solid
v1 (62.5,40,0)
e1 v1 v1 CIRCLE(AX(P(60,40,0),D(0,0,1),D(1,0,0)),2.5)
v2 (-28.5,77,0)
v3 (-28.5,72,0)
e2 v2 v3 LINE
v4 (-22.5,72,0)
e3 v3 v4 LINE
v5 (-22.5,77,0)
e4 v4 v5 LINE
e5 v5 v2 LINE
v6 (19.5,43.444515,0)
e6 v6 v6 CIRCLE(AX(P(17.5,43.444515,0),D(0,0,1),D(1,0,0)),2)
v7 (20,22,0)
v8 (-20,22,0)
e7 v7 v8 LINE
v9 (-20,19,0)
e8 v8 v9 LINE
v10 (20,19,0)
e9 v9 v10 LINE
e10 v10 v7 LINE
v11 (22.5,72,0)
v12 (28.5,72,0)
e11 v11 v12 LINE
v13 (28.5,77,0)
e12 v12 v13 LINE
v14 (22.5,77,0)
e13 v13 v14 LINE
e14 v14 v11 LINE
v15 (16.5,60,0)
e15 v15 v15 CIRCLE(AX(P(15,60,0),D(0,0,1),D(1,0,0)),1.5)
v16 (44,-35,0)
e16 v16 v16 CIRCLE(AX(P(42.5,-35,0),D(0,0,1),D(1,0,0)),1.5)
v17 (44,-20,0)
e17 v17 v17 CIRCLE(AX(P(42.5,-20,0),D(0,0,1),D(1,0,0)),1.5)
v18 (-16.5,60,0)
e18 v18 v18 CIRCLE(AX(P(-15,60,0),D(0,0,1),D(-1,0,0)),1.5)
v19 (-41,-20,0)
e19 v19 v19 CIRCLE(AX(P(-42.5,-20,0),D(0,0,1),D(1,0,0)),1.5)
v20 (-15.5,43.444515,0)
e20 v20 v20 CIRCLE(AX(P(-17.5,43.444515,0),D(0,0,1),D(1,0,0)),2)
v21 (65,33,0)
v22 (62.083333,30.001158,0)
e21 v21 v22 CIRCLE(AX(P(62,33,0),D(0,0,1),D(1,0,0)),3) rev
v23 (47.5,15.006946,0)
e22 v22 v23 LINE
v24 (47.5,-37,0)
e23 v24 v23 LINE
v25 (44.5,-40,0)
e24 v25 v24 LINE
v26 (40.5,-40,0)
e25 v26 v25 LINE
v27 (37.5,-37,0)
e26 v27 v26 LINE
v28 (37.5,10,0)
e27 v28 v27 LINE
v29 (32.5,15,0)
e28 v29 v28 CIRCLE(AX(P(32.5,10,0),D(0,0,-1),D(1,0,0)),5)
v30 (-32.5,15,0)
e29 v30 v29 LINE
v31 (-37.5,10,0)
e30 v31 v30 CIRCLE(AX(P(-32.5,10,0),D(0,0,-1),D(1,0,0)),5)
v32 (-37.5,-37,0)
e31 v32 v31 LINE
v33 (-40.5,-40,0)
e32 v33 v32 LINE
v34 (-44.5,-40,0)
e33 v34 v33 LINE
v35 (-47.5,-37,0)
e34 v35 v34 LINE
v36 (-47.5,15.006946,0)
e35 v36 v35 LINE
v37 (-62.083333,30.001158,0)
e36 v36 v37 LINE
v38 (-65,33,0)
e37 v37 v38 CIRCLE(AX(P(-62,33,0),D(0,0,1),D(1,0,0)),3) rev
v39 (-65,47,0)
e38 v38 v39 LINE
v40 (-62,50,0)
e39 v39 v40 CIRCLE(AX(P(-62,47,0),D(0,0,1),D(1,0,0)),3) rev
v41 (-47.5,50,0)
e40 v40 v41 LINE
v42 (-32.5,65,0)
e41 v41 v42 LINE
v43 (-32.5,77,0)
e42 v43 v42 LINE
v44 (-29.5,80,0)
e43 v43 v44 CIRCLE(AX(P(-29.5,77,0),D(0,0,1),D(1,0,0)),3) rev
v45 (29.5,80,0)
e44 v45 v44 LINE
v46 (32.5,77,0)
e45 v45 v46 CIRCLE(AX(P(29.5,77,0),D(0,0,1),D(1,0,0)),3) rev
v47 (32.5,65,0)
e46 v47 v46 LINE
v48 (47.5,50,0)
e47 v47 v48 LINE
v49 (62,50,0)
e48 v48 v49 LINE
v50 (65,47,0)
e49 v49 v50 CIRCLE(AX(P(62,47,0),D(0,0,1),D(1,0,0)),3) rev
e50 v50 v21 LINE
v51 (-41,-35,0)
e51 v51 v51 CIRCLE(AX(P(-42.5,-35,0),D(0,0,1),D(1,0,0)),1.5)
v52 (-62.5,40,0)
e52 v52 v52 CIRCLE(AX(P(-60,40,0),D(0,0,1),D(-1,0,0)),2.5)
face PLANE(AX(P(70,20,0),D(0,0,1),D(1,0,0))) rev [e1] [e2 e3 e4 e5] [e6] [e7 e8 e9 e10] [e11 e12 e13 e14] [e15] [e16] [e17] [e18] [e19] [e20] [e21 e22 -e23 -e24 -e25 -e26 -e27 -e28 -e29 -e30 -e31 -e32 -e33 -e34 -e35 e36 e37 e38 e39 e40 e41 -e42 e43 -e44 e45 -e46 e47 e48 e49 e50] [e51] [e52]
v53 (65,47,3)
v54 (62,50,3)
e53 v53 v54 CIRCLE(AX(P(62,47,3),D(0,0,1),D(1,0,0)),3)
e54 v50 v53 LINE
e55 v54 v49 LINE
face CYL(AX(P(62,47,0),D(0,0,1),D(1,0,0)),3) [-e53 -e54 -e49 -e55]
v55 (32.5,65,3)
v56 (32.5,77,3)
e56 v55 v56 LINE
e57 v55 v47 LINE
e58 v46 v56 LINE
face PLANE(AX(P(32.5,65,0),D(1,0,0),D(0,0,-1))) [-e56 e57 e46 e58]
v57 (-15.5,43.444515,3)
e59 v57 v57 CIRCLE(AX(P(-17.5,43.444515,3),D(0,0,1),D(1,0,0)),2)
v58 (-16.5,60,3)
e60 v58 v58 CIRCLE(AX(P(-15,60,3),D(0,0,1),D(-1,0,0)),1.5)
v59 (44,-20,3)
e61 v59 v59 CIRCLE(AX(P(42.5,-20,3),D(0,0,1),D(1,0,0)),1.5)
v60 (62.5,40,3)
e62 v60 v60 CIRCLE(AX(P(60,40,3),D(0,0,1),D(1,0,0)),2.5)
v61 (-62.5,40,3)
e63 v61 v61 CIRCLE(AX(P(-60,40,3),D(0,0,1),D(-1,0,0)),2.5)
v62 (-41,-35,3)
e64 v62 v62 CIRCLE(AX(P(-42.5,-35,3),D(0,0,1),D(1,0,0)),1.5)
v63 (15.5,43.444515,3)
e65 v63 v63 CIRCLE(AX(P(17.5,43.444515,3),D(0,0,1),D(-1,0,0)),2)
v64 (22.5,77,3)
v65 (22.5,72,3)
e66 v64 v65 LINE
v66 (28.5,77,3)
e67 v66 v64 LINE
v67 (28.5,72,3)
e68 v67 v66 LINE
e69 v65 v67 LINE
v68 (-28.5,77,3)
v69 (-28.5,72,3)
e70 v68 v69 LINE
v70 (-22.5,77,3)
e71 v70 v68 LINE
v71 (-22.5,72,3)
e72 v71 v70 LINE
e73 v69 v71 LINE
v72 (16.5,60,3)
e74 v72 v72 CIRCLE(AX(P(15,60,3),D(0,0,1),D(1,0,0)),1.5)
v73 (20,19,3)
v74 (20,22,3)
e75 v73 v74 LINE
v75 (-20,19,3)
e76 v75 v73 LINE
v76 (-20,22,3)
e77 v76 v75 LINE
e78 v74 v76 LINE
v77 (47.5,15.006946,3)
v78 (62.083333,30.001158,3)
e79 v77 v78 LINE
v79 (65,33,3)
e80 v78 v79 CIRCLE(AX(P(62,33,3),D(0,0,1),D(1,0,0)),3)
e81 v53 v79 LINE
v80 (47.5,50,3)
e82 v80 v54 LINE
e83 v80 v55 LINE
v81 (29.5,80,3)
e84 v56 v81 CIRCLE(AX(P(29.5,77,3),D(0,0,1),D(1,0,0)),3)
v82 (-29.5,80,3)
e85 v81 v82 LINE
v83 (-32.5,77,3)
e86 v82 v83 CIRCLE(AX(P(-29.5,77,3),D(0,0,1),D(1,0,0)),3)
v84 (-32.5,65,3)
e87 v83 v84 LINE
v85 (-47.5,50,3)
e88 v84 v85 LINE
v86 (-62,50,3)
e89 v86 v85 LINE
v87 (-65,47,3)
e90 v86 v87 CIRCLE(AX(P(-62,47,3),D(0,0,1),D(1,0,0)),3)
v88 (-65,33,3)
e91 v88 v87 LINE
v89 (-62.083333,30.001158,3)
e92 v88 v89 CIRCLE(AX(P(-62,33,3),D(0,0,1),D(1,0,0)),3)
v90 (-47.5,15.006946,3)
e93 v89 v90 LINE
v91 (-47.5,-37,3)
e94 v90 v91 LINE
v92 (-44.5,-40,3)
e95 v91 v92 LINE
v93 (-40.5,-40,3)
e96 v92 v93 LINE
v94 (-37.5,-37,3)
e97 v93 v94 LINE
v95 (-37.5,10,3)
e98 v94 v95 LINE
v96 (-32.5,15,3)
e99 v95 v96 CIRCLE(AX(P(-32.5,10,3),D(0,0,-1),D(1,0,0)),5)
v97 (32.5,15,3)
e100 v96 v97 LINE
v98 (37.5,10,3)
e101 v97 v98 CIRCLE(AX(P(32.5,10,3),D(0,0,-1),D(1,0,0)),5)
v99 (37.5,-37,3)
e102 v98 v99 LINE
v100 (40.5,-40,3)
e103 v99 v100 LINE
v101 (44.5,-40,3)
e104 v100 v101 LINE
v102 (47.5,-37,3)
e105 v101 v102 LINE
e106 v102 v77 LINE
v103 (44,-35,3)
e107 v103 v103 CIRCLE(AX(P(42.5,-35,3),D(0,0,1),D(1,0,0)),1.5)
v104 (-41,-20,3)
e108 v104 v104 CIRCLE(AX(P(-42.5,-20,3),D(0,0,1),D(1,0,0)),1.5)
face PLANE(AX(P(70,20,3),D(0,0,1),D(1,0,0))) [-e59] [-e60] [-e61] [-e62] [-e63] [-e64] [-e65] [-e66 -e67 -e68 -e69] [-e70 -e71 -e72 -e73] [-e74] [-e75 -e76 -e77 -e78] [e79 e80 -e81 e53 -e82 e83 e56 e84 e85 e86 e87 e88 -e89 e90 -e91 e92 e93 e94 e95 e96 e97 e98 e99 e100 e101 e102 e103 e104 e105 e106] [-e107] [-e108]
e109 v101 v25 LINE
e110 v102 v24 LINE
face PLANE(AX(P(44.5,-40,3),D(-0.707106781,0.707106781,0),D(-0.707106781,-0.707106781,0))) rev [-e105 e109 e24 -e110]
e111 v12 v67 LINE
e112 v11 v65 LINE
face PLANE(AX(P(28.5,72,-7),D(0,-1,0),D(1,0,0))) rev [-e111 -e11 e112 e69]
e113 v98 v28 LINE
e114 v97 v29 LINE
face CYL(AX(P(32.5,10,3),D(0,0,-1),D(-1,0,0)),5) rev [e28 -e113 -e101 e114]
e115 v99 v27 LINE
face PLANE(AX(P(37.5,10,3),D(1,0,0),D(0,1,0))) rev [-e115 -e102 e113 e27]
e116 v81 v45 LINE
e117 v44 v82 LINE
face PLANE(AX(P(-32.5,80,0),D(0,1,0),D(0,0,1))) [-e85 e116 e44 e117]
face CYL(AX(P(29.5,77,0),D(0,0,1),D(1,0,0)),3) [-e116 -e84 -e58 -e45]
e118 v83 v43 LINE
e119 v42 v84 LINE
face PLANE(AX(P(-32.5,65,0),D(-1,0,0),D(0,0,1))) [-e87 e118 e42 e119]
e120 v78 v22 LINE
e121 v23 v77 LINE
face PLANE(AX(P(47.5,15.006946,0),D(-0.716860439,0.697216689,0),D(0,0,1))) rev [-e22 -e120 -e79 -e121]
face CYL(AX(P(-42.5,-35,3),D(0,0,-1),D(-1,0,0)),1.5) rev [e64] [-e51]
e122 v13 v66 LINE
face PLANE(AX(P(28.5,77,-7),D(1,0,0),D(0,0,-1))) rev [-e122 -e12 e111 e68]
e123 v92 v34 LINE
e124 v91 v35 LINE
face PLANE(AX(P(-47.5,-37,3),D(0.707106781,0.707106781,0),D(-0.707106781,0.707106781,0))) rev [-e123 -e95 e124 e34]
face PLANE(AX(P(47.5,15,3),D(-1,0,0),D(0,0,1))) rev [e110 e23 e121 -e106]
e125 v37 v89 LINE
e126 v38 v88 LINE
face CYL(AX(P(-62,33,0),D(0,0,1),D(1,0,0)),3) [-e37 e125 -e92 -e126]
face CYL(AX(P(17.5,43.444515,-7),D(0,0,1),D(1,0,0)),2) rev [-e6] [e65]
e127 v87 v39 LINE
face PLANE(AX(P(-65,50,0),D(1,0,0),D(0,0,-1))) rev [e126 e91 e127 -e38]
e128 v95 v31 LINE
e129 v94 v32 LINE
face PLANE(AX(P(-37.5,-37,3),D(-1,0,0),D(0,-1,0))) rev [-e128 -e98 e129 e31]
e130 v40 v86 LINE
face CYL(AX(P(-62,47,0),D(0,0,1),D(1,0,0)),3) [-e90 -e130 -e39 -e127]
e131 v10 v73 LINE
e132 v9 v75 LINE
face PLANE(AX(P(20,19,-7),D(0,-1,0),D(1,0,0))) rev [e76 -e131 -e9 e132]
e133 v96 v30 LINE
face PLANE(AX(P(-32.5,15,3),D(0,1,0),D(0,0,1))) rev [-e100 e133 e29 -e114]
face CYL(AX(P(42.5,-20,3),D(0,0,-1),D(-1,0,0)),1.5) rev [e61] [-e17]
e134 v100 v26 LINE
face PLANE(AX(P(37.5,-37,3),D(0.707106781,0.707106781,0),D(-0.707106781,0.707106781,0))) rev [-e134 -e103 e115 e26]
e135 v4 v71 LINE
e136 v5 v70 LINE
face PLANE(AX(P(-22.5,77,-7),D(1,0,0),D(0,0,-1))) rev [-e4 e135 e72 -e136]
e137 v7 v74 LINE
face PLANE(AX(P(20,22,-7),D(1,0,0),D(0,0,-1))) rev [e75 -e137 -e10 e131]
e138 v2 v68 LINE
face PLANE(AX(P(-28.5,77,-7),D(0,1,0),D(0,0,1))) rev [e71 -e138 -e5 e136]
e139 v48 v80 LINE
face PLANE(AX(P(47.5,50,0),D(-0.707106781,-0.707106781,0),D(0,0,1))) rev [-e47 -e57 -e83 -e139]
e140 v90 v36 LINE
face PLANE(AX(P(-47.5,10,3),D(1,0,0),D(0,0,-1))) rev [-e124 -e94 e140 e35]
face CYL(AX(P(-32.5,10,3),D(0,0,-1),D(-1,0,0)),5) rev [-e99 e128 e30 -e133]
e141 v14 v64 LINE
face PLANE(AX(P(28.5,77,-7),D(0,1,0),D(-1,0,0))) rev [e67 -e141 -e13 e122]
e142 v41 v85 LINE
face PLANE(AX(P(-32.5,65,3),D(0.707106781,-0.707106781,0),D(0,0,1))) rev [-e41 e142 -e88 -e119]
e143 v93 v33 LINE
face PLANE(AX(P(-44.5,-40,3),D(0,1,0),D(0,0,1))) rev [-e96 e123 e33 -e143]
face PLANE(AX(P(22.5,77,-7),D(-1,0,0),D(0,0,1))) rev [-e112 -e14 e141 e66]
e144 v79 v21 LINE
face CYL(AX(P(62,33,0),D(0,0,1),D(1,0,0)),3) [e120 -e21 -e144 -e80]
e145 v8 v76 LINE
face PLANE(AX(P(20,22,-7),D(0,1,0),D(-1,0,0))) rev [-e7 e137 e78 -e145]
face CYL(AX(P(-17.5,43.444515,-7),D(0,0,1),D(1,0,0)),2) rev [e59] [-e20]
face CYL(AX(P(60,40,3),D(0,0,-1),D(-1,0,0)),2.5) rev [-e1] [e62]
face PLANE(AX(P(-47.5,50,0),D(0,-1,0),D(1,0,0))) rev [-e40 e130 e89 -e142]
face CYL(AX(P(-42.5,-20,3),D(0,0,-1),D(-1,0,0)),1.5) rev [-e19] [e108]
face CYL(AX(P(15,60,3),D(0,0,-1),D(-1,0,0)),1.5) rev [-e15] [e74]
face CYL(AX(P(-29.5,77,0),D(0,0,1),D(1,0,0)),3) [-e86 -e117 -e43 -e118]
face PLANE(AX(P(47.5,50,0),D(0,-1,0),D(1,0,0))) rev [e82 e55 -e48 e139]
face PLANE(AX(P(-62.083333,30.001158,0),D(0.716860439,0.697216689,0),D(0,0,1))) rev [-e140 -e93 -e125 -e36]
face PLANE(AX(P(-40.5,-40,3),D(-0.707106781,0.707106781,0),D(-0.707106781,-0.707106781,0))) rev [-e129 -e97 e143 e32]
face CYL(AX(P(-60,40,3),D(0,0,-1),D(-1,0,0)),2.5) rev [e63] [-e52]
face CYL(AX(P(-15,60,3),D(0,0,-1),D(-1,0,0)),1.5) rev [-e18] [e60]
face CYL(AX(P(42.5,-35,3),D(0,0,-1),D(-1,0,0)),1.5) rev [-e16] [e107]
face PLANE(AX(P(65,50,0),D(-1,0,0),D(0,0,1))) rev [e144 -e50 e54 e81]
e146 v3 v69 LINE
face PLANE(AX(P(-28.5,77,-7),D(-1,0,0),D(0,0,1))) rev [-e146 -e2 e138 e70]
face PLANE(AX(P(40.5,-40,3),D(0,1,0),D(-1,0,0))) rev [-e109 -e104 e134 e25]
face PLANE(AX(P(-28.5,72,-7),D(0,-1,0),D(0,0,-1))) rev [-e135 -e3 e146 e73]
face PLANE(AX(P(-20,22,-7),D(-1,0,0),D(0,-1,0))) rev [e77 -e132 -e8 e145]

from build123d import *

# Parameters (mm, degrees)
SKETCH1_R           = 1.5
SKETCH1_R_2         = 2.5
BOSS_EXTRUDE1_DEPTH = 3
CUT_EXTRUDE1_DEPTH  = 3
FILLET1_R           = 3
CHAMFER4_SIZE       = 15
CHAMFER5_DEPTH      = 3
SKETCH8_R           = 2
CUT_EXTRUDE4_DEPTH  = 10
SKETCH10_W          = 65
SKETCH10_H          = 15
BOSS_EXTRUDE2_DEPTH = 3
SKETCH9_W           = 6
SKETCH9_H           = 5
CUT_EXTRUDE5_DEPTH  = 10
FILLET2_R           = 3
SKETCH11_W          = 40
SKETCH11_H          = 3
CUT_EXTRUDE6_DEPTH  = 10


with BuildPart() as part:
    # Sketch1 → Boss-Extrude1 (new body)
    with BuildSketch(Plane.XY):
        with BuildLine():
            Line((40.5, -40), (44.5, -40))
            Line((44.5, -40), (47.5, -37))
            Line((47.5, -37), (47.5, 10))
            Line((47.5, 10), (47.5, 15))
            Line((47.5, 15), (52.5, 15))
            Line((52.5, 15), (70, 15))
            ThreePointArc((70, 15), (73.535533906, 16.464466094), (75, 20))
            Line((75, 20), (75, 60))
            ThreePointArc((75, 60), (73.535533906, 63.535533906), (70, 65))
            Line((70, 65), (-70, 65))
            ThreePointArc((-70, 65), (-73.535533906, 63.535533906), (-75, 60))
            Line((-75, 60), (-75, 20))
            ThreePointArc((-75, 20), (-73.535533906, 16.464466094), (-70, 15))
            Line((-70, 15), (-52.5, 15))
            Line((-52.5, 15), (-47.5, 15))
            Line((-47.5, 15), (-47.5, 10))
            Line((-47.5, 10), (-47.5, -37))
            Line((-47.5, -37), (-44.5, -40))
            Line((-44.5, -40), (-40.5, -40))
            Line((-40.5, -40), (-37.5, -37))
            Line((-37.5, -37), (-37.5, 10))
            ThreePointArc((-37.5, 10), (-36.035533906, 13.535533906), (-32.5, 15))
            Line((-32.5, 15), (32.5, 15))
            ThreePointArc((32.5, 15), (36.035533906, 13.535533906), (37.5, 10))
            Line((37.5, 10), (37.5, -37))
            Line((37.5, -37), (40.5, -40))
        make_face()
        with Locations((-42.5, -20)):
            Circle(SKETCH1_R, mode=Mode.SUBTRACT)
        with Locations((-42.5, -35)):
            Circle(SKETCH1_R, mode=Mode.SUBTRACT)
        with Locations((42.5, -20)):
            Circle(SKETCH1_R, mode=Mode.SUBTRACT)
        with Locations((42.5, -35)):
            Circle(SKETCH1_R, mode=Mode.SUBTRACT)
        with Locations((60, 40)):
            Circle(SKETCH1_R_2, mode=Mode.SUBTRACT)
        with Locations((15, 60)):
            Circle(SKETCH1_R, mode=Mode.SUBTRACT)
        with Locations(Location((-15, 60, 0), (0, 0, 180))):
            Circle(SKETCH1_R, mode=Mode.SUBTRACT)
        with Locations(Location((-60, 40, 0), (0, 0, 180))):
            Circle(SKETCH1_R_2, mode=Mode.SUBTRACT)
    extrude(amount=BOSS_EXTRUDE1_DEPTH)

    # Sketch3 → Cut-Extrude1 (cut)
    with BuildSketch(Plane.XY.offset(3)):
        Polygon((65, 50), (65, 30), (47.5, 30), (47.5, 15), (75, 15), (75, 23.034767996), (75, 32.364095159), (75, 65), (47.5, 65), (47.5, 50), align=None)
        Polygon((-47.5, 65), (-75, 65), (-75, 32.364095159), (-75, 23.034767996), (-75, 15), (-47.5, 15), (-47.5, 30), (-65, 30), (-65, 50), (-47.5, 50), align=None)
    extrude(amount=-CUT_EXTRUDE1_DEPTH, mode=Mode.SUBTRACT)

    # Fillet1
    fillet1_edges = [part.edges().sort_by_distance(p)[0] for p in [
        (65, 50, 1.5),
        (65, 30, 1.5),
        (-65, 50, 1.5),
        (-65, 30, 1.5),
    ]]
    fillet(fillet1_edges, radius=FILLET1_R)

    # Chamfer4
    chamfer4_edges = [part.edges().sort_by_distance(p)[0] for p in [
        (47.5, 65, 1.5),
        (-47.5, 65, 1.5),
    ]]
    chamfer(chamfer4_edges, length=CHAMFER4_SIZE - 0.0001)  # a hair under: the kernel refuses the full size

    # Chamfer5: read off the stored shape, not the designer's step
    # Chamfer5 outline → Chamfer5 (add)
    with BuildSketch(Plane.XY):
        with BuildLine():
            Line((47.5, 15.006945785), (62.083333333, 30.001157631))
            ThreePointArc((62.083333333, 30.001157631), (62.041670687, 30.000289422), (62, 30))
            Line((62, 30), (47.5, 30))
            Line((47.5, 30), (47.5, 15.006945785))
        make_face()
        with BuildLine():
            Line((-62.083333333, 30.001157631), (-47.5, 15.006945785))
            Line((-47.5, 15.006945785), (-47.5, 30))
            Line((-47.5, 30), (-62, 30))
            ThreePointArc((-62, 30), (-62.041670687, 30.000289422), (-62.083333333, 30.001157631))
        make_face()
    extrude(amount=CHAMFER5_DEPTH)

    # Sketch8 → Cut-Extrude4 (cut)
    with BuildSketch(Plane.XY.offset(3)):
        with Locations((-17.5, 43.444515249)):
            Circle(SKETCH8_R)
        with Locations((17.5, 43.444515249)):
            Circle(SKETCH8_R)
    extrude(amount=-CUT_EXTRUDE4_DEPTH, mode=Mode.SUBTRACT)

    # Sketch10 → Boss-Extrude2 (add)
    with BuildSketch(Plane.XY.offset(3)):
        with Locations((0, 72.5)):
            Rectangle(SKETCH10_W, SKETCH10_H)
    extrude(amount=-BOSS_EXTRUDE2_DEPTH)

    # Sketch9 → Cut-Extrude5 (cut)
    with BuildSketch(Plane.XY.offset(3)):
        with Locations((-25.5, 74.5)):
            Rectangle(SKETCH9_W, SKETCH9_H)
        with Locations((25.5, 74.5)):
            Rectangle(SKETCH9_W, SKETCH9_H)
    extrude(amount=-CUT_EXTRUDE5_DEPTH, mode=Mode.SUBTRACT)

    # Fillet2
    fillet2_edges = [part.edges().sort_by_distance(p)[0] for p in [
        (-32.5, 80, 1.5),
        (32.5, 80, 1.5),
    ]]
    fillet(fillet2_edges, radius=FILLET2_R)

    # Sketch11 → Cut-Extrude6 (cut)
    with BuildSketch(Plane.XY.offset(3)):
        with Locations((0, 20.5)):
            Rectangle(SKETCH11_W, SKETCH11_H)
    extrude(amount=-CUT_EXTRUDE6_DEPTH, mode=Mode.SUBTRACT)


solid = part.part
